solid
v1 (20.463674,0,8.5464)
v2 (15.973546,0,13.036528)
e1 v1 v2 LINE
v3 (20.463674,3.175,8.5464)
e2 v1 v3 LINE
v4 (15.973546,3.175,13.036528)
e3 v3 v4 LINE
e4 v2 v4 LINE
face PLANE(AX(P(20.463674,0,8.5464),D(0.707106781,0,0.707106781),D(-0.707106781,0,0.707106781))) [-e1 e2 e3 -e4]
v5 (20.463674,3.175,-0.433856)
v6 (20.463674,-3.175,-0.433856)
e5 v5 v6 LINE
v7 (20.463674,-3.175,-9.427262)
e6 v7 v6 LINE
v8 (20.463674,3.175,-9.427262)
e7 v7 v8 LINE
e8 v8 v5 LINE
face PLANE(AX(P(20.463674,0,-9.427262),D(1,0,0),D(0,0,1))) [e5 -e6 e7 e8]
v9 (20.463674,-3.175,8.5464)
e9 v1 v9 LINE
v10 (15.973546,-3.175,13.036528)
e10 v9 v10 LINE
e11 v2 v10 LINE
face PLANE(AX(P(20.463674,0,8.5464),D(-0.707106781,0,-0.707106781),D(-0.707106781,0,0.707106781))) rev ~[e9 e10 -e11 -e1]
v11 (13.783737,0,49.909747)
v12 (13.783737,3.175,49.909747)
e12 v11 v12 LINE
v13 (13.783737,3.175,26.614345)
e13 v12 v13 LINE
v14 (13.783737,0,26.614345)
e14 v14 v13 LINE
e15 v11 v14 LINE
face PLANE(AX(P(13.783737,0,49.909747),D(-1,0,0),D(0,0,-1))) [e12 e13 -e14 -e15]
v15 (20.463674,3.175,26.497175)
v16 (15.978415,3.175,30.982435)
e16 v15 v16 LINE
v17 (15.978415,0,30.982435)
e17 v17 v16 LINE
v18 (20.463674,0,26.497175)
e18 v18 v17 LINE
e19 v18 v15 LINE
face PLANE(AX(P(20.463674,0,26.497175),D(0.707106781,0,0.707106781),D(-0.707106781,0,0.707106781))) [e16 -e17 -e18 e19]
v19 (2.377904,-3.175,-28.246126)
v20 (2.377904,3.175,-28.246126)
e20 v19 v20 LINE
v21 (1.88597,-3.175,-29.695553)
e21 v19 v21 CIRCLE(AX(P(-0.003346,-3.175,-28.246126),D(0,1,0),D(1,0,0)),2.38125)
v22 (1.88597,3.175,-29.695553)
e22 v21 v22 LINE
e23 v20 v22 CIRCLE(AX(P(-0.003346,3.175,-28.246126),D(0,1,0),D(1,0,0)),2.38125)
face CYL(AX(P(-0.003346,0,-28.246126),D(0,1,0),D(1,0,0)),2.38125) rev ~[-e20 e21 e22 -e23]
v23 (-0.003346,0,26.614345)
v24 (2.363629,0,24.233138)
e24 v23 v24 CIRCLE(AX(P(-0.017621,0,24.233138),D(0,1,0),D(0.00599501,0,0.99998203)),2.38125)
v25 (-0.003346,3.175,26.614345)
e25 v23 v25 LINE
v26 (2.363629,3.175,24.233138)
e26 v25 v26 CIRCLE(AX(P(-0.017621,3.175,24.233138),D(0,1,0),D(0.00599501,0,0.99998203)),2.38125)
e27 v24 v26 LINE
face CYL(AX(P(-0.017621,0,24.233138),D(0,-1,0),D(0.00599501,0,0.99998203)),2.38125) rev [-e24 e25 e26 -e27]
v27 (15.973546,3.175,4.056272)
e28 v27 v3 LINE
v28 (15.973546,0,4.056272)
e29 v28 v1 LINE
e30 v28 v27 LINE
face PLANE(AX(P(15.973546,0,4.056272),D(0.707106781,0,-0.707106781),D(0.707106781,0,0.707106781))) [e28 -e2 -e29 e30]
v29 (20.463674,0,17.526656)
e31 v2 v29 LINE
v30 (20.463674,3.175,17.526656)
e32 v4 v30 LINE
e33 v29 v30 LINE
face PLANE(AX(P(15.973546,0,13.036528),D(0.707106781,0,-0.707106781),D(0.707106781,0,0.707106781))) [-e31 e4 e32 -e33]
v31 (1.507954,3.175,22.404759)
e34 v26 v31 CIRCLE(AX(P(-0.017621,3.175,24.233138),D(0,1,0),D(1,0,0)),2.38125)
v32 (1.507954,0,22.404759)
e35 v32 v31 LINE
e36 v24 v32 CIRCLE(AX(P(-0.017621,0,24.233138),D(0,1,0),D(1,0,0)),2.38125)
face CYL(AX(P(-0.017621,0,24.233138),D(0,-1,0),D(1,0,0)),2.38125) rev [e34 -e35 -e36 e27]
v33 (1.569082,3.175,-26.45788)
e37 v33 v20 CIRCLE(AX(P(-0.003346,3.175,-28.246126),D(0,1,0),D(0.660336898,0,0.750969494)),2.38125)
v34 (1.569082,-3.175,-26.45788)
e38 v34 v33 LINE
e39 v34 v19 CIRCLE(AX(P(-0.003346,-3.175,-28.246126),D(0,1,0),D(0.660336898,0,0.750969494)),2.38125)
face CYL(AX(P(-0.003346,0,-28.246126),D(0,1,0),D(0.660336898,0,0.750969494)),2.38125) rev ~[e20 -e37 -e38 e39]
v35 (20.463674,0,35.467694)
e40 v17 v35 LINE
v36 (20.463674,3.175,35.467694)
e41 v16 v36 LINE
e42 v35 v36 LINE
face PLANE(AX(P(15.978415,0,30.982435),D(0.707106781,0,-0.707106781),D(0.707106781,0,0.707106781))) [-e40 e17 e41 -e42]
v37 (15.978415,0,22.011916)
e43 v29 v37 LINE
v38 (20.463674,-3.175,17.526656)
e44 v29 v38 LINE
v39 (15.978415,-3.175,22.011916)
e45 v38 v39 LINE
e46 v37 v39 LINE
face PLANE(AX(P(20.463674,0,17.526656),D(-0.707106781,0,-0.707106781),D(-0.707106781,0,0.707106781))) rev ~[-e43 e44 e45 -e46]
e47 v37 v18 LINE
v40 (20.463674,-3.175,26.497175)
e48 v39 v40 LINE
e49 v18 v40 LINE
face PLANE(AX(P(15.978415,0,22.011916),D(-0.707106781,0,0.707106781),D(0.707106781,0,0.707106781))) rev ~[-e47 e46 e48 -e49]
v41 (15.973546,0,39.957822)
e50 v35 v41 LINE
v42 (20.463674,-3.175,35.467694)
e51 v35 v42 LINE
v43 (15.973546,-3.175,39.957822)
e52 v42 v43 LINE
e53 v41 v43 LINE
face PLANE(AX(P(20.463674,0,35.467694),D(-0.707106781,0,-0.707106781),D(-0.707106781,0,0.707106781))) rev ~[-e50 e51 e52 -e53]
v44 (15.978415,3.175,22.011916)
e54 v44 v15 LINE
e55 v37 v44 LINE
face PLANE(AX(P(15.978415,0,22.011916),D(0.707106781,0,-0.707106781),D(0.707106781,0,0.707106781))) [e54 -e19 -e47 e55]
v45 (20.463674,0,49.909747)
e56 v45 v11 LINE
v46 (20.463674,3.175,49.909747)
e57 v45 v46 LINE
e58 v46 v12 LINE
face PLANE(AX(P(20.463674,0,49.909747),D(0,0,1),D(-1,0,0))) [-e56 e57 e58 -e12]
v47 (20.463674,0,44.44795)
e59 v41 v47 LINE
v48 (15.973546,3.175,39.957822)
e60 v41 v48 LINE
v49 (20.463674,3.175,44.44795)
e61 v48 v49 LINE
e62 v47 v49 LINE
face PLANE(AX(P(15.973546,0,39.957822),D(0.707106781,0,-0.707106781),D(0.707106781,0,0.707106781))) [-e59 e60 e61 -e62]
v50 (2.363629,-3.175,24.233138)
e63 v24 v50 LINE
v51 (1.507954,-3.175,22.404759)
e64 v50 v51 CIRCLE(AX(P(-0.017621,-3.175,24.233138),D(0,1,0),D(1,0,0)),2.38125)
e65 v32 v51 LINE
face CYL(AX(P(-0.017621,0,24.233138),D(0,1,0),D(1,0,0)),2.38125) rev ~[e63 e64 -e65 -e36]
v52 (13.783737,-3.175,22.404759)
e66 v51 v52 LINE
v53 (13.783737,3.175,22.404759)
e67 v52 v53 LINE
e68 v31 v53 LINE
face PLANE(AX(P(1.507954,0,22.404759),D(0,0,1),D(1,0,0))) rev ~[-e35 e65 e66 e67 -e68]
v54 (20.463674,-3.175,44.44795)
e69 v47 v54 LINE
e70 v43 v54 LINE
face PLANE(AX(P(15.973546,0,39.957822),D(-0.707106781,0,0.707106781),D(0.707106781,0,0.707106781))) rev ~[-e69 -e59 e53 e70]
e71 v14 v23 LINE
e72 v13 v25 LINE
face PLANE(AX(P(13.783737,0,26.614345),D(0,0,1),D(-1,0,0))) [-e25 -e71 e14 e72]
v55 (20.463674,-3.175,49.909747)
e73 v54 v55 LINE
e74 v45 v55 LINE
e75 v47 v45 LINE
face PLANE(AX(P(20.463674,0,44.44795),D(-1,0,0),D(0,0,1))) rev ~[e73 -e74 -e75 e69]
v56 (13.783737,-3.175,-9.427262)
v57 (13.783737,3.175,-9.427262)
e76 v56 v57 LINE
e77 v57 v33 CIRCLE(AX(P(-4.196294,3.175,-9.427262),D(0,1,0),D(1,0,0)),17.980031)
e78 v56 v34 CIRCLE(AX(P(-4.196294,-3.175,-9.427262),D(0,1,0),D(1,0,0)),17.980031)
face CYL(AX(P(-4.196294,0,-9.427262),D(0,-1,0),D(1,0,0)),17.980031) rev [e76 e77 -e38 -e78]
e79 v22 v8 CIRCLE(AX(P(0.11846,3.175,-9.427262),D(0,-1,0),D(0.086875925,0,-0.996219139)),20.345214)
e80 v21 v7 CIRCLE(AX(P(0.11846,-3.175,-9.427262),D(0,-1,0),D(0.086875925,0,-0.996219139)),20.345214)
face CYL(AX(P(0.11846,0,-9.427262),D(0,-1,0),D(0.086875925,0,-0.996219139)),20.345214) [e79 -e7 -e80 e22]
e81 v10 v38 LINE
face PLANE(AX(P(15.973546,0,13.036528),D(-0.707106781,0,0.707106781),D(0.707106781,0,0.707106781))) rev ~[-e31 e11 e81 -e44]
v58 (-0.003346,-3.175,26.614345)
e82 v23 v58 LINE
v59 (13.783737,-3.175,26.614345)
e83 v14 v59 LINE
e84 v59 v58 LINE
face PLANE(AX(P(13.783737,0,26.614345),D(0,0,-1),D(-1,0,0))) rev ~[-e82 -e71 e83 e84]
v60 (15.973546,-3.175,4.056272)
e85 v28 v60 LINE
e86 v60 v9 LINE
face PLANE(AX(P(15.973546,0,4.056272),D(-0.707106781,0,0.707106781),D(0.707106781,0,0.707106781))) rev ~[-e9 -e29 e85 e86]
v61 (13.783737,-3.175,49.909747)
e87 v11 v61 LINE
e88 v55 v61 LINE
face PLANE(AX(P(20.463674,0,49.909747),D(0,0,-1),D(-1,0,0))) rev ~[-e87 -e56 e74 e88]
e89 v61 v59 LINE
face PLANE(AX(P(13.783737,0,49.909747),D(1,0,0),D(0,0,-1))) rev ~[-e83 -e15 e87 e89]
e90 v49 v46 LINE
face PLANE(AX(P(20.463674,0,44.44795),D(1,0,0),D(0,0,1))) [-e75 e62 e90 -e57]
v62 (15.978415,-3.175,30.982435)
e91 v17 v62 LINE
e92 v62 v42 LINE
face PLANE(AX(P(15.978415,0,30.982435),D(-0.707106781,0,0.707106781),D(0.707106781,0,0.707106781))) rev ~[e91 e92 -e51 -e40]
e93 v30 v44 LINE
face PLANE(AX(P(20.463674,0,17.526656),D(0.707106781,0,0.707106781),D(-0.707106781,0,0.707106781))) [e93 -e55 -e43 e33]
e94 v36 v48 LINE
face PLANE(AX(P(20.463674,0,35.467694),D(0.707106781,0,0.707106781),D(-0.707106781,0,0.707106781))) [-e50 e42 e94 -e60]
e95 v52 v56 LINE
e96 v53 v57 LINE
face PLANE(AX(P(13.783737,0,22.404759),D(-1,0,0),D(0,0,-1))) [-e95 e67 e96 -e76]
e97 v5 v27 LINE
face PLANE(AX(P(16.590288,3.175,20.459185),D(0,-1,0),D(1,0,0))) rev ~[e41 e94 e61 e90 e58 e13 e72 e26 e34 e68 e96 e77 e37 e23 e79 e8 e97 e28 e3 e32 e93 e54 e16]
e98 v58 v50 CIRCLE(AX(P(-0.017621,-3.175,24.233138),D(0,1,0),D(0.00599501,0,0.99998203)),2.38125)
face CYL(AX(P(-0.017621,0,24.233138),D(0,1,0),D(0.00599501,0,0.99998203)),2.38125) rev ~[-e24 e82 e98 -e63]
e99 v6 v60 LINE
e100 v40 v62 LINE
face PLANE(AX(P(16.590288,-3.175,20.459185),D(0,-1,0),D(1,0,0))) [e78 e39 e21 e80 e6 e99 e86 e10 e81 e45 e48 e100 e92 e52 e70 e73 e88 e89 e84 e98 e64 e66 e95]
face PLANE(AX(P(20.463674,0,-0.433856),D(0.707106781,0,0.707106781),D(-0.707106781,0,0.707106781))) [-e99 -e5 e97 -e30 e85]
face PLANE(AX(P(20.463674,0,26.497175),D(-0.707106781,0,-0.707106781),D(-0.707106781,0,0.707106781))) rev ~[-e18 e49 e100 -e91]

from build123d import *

# Parameters (mm, degrees)
F1_DEPTH = 3.175


# Not quite as in the source:
# - a feature names something its author has since deleted; it is built from what else it names


with BuildPart() as f1:
    # F0 (on Front) → F1 (new body, symmetric)
    with BuildSketch(Plane.XZ):
        Polygon((13.7837369962, 22.4047590313), (13.7837369962, -9.4272618645), (20.4636742089, -9.4272618645), (20.4636742089, -0.4338561879), (15.9735461484, 4.0562718726), (20.4636742089, 8.5463999331), (15.9735461484, 13.0365279937), (20.4636742089, 17.5266560542), (15.978414683, 22.0119155801), (20.4636742089, 26.497175106), (15.978414683, 30.9824346319), (20.4636742089, 35.4676941578), (15.9735461484, 39.9578222184), (20.4636742089, 44.4479502789), (20.4636742089, 49.9097465079), (13.7837369962, 49.9097465079), (13.7837369962, 26.6143454669), align=None)
        with BuildLine():
            ThreePointArc((1.5690815371, -26.4578800095), (2.166296426, -27.2647981392), (2.3779042983, -28.246126117))
            ThreePointArc((2.3779042983, -28.246126117), (2.2515693271, -29.011442898), (1.8859695789, -29.69555336))
            ThreePointArc((1.8859695789, -29.69555336), (15.116594907, -23.1743956519), (20.4636742089, -9.4272618645))
            Line((20.4636742089, -9.4272618645), (13.7837369962, -9.4272618645))
            ThreePointArc((13.7837369962, -9.4272618645), (10.4143723985, -19.9062857024), (1.5690815371, -26.4578800095))
        make_face()
        with BuildLine():
            Line((1.5079542983, 22.4047590313), (13.7837369962, 22.4047590313))
            Line((13.7837369962, 22.4047590313), (13.7837369962, 26.6143454669))
            Line((13.7837369962, 26.6143454669), (-0.0033457017, 26.6143454669))
            ThreePointArc((-0.0033457017, 26.6143454669), (1.6712163547, 25.9118815011), (2.363628681, 24.2331382585))
            ThreePointArc((2.363628681, 24.2331382585), (2.1391272177, 23.2237883133), (1.5079542983, 22.4047590313))
        make_face()
    extrude(amount=F1_DEPTH, both=True)


solid = f1.part
